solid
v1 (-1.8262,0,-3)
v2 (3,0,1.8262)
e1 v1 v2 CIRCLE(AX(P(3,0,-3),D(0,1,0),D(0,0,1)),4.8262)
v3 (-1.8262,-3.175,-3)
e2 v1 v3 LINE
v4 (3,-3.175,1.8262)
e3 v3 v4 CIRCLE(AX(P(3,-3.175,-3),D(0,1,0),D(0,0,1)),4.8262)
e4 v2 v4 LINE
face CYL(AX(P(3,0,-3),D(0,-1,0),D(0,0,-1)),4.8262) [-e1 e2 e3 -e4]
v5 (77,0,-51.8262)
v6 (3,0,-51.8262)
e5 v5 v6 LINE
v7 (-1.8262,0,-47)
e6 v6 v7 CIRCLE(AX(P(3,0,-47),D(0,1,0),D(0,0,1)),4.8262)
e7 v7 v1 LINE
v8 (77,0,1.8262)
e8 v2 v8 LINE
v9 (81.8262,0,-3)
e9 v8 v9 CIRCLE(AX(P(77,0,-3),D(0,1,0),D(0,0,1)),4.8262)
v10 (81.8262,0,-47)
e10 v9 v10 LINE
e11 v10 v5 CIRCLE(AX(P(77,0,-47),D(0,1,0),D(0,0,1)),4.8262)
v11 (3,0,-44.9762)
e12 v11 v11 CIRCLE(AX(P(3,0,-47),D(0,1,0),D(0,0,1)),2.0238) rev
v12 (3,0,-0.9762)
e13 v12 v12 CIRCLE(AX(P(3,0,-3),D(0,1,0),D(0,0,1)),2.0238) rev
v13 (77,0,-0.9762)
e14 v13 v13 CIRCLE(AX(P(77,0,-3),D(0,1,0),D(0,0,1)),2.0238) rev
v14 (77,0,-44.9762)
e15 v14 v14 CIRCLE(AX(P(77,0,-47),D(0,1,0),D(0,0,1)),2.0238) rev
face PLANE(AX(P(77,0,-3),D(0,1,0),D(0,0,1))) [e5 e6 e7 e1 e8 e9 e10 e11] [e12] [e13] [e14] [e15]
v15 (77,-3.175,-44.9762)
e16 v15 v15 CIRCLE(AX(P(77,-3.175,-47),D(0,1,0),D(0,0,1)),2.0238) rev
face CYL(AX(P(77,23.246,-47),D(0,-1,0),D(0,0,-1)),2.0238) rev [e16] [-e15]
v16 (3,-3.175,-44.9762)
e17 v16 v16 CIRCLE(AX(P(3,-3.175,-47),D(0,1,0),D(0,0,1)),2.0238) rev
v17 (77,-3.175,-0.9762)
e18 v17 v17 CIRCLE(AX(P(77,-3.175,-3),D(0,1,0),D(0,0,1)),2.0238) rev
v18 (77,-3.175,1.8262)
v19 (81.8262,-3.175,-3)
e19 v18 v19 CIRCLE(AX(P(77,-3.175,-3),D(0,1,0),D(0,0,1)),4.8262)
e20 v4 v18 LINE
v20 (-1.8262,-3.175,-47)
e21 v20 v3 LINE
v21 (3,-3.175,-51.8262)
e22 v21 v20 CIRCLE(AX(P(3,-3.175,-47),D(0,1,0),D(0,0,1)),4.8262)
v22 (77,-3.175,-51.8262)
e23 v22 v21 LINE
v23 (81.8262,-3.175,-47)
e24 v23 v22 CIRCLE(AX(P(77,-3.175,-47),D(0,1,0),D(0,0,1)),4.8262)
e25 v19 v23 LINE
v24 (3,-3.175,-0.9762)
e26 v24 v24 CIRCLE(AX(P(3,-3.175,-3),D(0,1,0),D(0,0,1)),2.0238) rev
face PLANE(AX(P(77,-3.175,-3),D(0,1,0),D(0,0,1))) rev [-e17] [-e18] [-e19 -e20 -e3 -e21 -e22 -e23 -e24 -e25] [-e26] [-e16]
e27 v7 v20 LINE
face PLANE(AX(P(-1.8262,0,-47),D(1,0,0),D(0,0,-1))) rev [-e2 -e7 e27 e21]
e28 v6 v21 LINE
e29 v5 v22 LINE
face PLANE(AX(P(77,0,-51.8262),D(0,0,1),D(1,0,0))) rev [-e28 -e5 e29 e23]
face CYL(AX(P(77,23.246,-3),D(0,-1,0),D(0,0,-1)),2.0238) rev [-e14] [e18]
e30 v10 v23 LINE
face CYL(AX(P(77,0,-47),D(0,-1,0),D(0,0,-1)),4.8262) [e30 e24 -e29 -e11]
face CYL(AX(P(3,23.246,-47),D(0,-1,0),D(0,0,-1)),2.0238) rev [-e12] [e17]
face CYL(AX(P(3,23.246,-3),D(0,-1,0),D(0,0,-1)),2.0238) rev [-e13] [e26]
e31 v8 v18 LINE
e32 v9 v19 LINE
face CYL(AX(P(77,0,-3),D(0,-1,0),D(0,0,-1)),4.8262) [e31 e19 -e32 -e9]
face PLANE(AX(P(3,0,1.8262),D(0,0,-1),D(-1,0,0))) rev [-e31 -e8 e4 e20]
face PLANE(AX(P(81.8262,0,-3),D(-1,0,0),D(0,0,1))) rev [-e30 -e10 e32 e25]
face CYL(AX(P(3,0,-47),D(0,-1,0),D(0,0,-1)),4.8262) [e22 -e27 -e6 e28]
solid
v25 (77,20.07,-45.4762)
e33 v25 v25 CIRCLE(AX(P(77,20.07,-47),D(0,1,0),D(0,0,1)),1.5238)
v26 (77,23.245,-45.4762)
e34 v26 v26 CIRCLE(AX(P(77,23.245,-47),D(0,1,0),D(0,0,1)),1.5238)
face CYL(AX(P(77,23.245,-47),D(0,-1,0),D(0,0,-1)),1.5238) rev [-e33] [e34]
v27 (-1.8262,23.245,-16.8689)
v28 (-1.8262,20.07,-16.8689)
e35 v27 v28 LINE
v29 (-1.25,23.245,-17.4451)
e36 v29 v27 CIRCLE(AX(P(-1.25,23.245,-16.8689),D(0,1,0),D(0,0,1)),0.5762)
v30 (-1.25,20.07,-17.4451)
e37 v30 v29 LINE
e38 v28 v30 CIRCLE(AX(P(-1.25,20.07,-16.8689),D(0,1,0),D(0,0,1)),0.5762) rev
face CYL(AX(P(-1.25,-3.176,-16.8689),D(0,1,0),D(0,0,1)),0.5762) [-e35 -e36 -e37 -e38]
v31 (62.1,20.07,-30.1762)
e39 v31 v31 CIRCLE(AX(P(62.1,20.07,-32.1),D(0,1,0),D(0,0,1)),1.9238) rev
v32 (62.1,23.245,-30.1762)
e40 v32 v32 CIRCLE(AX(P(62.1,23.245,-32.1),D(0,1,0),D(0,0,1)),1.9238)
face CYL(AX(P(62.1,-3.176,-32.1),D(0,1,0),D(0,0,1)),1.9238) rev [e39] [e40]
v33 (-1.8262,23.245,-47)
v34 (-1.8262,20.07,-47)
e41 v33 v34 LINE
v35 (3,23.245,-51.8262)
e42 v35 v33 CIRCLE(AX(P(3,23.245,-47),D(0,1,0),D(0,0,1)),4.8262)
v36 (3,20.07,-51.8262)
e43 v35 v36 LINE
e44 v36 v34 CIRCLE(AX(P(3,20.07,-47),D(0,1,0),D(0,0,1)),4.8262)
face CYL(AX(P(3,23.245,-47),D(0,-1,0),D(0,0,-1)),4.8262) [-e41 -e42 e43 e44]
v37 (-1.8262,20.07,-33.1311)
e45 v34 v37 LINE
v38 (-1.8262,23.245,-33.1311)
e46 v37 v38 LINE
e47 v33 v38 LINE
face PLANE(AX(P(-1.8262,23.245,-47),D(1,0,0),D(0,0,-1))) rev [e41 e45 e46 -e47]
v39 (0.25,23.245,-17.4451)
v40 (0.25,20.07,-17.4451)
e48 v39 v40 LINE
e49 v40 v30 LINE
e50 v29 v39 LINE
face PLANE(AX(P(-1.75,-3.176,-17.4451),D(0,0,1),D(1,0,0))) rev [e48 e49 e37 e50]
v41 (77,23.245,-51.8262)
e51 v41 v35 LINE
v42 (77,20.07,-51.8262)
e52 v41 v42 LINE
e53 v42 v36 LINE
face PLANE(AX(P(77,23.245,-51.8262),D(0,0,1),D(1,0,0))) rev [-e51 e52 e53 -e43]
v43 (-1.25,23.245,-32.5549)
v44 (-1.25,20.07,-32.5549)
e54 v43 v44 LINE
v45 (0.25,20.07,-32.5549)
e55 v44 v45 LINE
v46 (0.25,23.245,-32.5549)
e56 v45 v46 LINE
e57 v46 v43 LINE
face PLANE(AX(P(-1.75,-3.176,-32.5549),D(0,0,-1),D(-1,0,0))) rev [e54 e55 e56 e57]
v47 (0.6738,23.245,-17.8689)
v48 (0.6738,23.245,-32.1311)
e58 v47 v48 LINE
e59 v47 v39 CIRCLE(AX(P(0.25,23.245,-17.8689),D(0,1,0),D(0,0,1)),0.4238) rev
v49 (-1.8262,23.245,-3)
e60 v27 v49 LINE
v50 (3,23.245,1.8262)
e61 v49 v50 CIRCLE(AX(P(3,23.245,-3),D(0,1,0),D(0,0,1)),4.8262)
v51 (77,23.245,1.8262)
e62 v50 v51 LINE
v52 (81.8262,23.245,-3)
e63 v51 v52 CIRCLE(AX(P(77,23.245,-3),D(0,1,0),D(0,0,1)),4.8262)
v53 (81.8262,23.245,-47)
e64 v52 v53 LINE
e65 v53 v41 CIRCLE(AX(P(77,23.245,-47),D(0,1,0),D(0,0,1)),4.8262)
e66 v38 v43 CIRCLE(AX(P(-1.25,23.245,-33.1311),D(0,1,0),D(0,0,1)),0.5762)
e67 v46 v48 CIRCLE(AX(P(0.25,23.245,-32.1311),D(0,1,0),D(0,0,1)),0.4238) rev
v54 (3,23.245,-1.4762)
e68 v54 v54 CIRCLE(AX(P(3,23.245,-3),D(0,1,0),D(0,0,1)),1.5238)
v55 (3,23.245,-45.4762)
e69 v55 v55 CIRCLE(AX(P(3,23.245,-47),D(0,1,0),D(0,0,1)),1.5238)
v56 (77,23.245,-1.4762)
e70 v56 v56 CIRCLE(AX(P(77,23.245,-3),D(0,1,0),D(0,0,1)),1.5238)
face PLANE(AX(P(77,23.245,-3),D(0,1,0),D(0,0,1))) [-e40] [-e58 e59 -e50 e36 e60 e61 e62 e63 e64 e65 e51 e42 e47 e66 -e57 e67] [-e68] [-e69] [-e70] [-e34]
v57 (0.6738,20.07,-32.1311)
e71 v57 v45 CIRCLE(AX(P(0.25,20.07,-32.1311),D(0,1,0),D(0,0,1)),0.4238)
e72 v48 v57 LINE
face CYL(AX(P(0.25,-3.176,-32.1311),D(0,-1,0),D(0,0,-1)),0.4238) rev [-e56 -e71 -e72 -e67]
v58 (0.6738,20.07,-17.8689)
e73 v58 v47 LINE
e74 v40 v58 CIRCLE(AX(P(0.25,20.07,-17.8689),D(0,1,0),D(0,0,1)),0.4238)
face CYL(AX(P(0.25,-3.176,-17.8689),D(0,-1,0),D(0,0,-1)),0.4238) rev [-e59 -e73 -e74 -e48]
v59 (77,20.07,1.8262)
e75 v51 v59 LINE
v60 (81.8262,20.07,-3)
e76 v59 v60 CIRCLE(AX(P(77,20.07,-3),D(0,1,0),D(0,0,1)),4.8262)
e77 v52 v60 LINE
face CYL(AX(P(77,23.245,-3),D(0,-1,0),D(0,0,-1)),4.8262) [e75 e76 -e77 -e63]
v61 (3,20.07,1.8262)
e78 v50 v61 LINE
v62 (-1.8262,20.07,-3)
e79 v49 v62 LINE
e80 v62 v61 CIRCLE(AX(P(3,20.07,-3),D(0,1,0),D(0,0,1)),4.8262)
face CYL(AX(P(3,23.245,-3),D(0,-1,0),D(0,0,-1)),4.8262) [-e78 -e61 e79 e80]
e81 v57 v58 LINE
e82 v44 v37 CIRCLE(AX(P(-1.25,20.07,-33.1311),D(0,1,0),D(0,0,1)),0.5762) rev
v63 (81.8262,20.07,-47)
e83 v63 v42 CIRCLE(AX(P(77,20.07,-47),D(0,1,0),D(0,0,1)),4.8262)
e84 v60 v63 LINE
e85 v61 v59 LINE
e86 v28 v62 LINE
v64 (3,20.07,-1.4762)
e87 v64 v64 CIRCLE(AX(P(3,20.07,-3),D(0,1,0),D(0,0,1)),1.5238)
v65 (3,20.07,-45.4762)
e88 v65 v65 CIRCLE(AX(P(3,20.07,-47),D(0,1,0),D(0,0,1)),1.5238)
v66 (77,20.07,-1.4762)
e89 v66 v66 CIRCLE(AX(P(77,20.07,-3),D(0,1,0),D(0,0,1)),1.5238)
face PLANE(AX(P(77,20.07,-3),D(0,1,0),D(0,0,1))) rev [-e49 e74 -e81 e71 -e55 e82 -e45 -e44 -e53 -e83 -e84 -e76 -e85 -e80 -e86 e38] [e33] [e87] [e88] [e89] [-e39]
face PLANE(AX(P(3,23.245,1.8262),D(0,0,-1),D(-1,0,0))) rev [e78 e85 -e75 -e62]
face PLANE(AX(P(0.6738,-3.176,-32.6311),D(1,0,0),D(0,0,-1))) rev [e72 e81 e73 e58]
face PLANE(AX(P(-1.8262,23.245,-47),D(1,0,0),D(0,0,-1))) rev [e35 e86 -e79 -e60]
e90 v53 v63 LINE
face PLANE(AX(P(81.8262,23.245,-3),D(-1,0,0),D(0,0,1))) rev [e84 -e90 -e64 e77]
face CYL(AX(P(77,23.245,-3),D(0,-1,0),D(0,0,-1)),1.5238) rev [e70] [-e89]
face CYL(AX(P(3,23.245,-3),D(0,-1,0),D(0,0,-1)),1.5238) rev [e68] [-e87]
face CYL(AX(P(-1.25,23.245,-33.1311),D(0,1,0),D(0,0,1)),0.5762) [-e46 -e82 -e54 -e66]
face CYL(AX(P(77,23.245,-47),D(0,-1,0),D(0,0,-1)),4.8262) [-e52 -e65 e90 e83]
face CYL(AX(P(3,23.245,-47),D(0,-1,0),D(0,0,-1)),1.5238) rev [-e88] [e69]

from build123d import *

# Parameters (mm, degrees)
BOSS_EXTRUDE1_DEPTH             = 20.07
SKETCH3_R                       = 1.6
BOSS_EXTRUDE2_DEPTH             = 5.5
FILLET1_R                       = 2.5
CUT_EXTRUDE1_REACH              = 102.265
SKETCH4_R                       = 3.25
CUT_EXTRUDE2_REACH              = 102.265
SKETCH5_R                       = 2.15
CUT_EXTRUDE5_REACH              = 101.74
MOVE_START                      = 79.994994432
MOVE_FACE1_OUTLINE_R            = 3.75
MOVE_FACE1_OUTLINE_R_2          = 3.25
MOVE_FACE1_DEPTH                = 3.005005568
MOVE_START_2                    = -3
MOVE_FACE1_2_OUTLINE_R          = 2.65
MOVE_FACE1_2_OUTLINE_R_2        = 2.15
MOVE_FACE1_2_DEPTH              = 82.994994432
MOVE_FACE2_BY                   = 0.1
MOVE_FACE2_2_BY                 = 0.1
MOVE_FACE2_3_BY                 = 0.1
MOVE_FACE2_4_BY                 = 0.1
MOVE_FACE2_5_BY                 = 0.1
MOVE_FACE2_6_BY                 = 0.1
MOVE_FACE2_7_BY                 = 0.1
MOVE_FACE2_8_BY                 = 0.1
MOVE_FACE2_9_BY                 = 0.1
MOVE_FACE2_10_BY                = 0.1
MOVE_FACE2_11_BY                = 0.1
MOVE_FACE3_BY                   = 0.1
MOVE_FACE3_2_BY                 = 0.1
MOVE_FACE3_3_BY                 = 0.1
MOVE_FACE3_4_BY                 = 0.1
SKETCH6_R                       = 1.6
BOSS_EXTRUDE3_DEPTH             = 3.175
SKETCH7_R                       = 2
CUT_EXTRUDE3_DEPTH              = 3.175
SKETCH8_W                       = 2.5
SKETCH8_H                       = 15.2622
CUT_EXTRUDE4_DEPTH              = 3.175
SKETCH10_R                      = 2.1
M3_HEAT_SET_INSERT_HOLES_DEPTH  = 3.175
FILLET2_R                       = 0.5
KERF_START                      = -3.175
KERF_COMPENSATION_OUTLINE_R     = 2.1
KERF_COMPENSATION_OUTLINE_R_2   = 2.0238
KERF_COMPENSATION_DEPTH         = 3.175
KERF_START_2                    = 20.07
KERF_COMPENSATION_2_OUTLINE_R   = 1.6
KERF_COMPENSATION_2_OUTLINE_R_2 = 1.5238
KERF_COMPENSATION_2_OUTLINE_R_3 = 2
KERF_COMPENSATION_2_OUTLINE_R_4 = 1.9238
KERF_COMPENSATION_2_DEPTH       = 3.175


with BuildPart() as part:
    # Sketch2 → Boss-Extrude1 (new body)
    with BuildSketch(Plane(origin=(0, 0, 0), x_dir=(1, 0, 0), z_dir=(0, 1, 0))):
        with BuildLine():
            Line((77, 51.75), (3, 51.75))
            ThreePointArc((3, 51.75), (-0.358757211, 50.358757211), (-1.75, 47))
            Line((-1.75, 47), (-1.75, 3))
            ThreePointArc((-1.75, 3), (-0.358757211, -0.358757211), (3, -1.75))
            Line((3, -1.75), (77, -1.75))
            ThreePointArc((77, -1.75), (80.358757211, -0.358757211), (81.75, 3))
            Line((81.75, 3), (81.75, 47))
            ThreePointArc((81.75, 47), (80.358757211, 50.358757211), (77, 51.75))
        make_face()
        with BuildLine():
            Line((-0.25, 47), (-0.25, 3))
            ThreePointArc((-0.25, 3), (0.701902961, 0.701902961), (3, -0.25))
            Line((3, -0.25), (77, -0.25))
            ThreePointArc((77, -0.25), (79.298097039, 0.701902961), (80.25, 3))
            Line((80.25, 3), (80.25, 47))
            ThreePointArc((80.25, 47), (79.298097039, 49.298097039), (77, 50.25))
            Line((77, 50.25), (3, 50.25))
            ThreePointArc((3, 50.25), (0.701902961, 49.298097039), (-0.25, 47))
        make_face(mode=Mode.SUBTRACT)
    extrude(amount=BOSS_EXTRUDE1_DEPTH)

    # Sketch3 → Boss-Extrude2 (add)
    # profile 1 of 4: a face of its own
    with BuildSketch(Plane.XZ):
        with BuildLine():
            ThreePointArc((-0.25, -47), (0.701902961, -49.298097039), (3, -50.25))
            Line((3, -50.25), (5.5, -50.25))
            Line((5.5, -50.25), (5.5, -44.5))
            Line((5.5, -44.5), (-0.25, -44.5))
            Line((-0.25, -44.5), (-0.25, -47))
        make_face()
        with Locations(Location((3, -47, 0), (0, 0, 270))):
            Circle(SKETCH3_R, mode=Mode.SUBTRACT)
    # profile 2 of 4: a face of its own
    with BuildSketch(Plane.XZ):
        with BuildLine():
            Line((74.5, -44.5), (74.5, -50.25))
            Line((74.5, -50.25), (77, -50.25))
            ThreePointArc((77, -50.25), (79.298097039, -49.298097039), (80.25, -47))
            Line((80.25, -47), (80.25, -44.5))
            Line((80.25, -44.5), (74.5, -44.5))
        make_face()
        with Locations(Location((77, -47, 0), (0, 0, 270))):
            Circle(SKETCH3_R, mode=Mode.SUBTRACT)
    # profile 3 of 4: a face of its own
    with BuildSketch(Plane.XZ):
        with BuildLine():
            Line((74.5, -5.5), (80.25, -5.5))
            Line((80.25, -5.5), (80.25, -3))
            ThreePointArc((80.25, -3), (79.298097039, -0.701902961), (77, 0.25))
            Line((77, 0.25), (74.5, 0.25))
            Line((74.5, 0.25), (74.5, -5.5))
        make_face()
        with Locations(Location((77, -3, 0), (0, 0, 270))):
            Circle(SKETCH3_R, mode=Mode.SUBTRACT)
    # profile 4 of 4: a face of its own
    with BuildSketch(Plane.XZ):
        with BuildLine():
            Line((-0.25, -3), (-0.25, -5.5))
            Line((-0.25, -5.5), (5.5, -5.5))
            Line((5.5, -5.5), (5.5, 0.25))
            Line((5.5, 0.25), (3, 0.25))
            ThreePointArc((3, 0.25), (0.701902961, -0.701902961), (-0.25, -3))
        make_face()
        with Locations(Location((3, -3, 0), (0, 0, 270))):
            Circle(SKETCH3_R, mode=Mode.SUBTRACT)
    extrude(amount=-BOSS_EXTRUDE2_DEPTH)

    # Fillet1
    fillet1_edges = [part.edges().sort_by_distance(p)[0] for p in [
        (5.5, 2.75, 0.25),
        (5.5, 2.75, -5.5),
        (-0.25, 2.75, -5.5),
        (5.5, 2.75, -44.5),
        (5.5, 2.75, -50.25),
        (-0.25, 2.75, -44.5),
        (74.5, 2.75, -50.25),
        (74.5, 2.75, -44.5),
        (80.25, 2.75, -44.5),
        (74.5, 2.75, -5.5),
        (74.5, 2.75, 0.25),
        (80.25, 2.75, -5.5),
    ]]
    fillet(fillet1_edges, radius=FILLET1_R)

    # Sketch4 → Cut-Extrude1 (cut, up to next)
    with BuildSketch(Plane(origin=(81.75, 0, 0), x_dir=(0, 0, -1), z_dir=(1, 0, 0)), mode=Mode.PRIVATE) as cut_extrude1_sk1:
        with Locations((11.25, 13.5662)):
            Circle(SKETCH4_R)
    cut_extrude1_tool1 = extrude(cut_extrude1_sk1.sketch, amount=-CUT_EXTRUDE1_REACH, mode=Mode.PRIVATE) & part.part
    # Sketch4 → Cut-Extrude1 (cut, up to next)
    with BuildSketch(Plane(origin=(81.75, 0, 0), x_dir=(0, 0, -1), z_dir=(1, 0, 0)), mode=Mode.PRIVATE) as cut_extrude1_sk2:
        with BuildLine():
            Line((21.83, 7.07), (28.17, 7.07))
            ThreePointArc((28.17, 7.07), (29.089238816, 7.450761184), (29.47, 8.37))
            Line((29.47, 8.37), (29.47, 9.13))
            ThreePointArc((29.47, 9.13), (29.089238816, 10.049238816), (28.17, 10.43))
            Line((28.17, 10.43), (21.83, 10.43))
            ThreePointArc((21.83, 10.43), (20.910761184, 10.049238816), (20.53, 9.13))
            Line((20.53, 9.13), (20.53, 8.37))
            ThreePointArc((20.53, 8.37), (20.910761184, 7.450761184), (21.83, 7.07))
        make_face()
    cut_extrude1_tool2 = extrude(cut_extrude1_sk2.sketch, amount=-CUT_EXTRUDE1_REACH, mode=Mode.PRIVATE) & part.part
    # Sketch4 → Cut-Extrude1 (cut, up to next)
    with BuildSketch(Plane(origin=(81.75, 0, 0), x_dir=(0, 0, -1), z_dir=(1, 0, 0)), mode=Mode.PRIVATE) as cut_extrude1_sk3:
        with BuildLine():
            Line((36.5, 14.4662), (36.5, 20.07))
            ThreePointArc((36.5, 20.07), (39.6, 23.17), (42.7, 20.07))
            Line((42.7, 20.07), (42.7, 14.4662))
            ThreePointArc((42.7, 14.4662), (39.6, 11.3662), (36.5, 14.4662))
        make_face()
    cut_extrude1_tool3 = extrude(cut_extrude1_sk3.sketch, amount=-CUT_EXTRUDE1_REACH, mode=Mode.PRIVATE) & part.part
    # Sketch4 → Cut-Extrude1 (cut, up to next)
    with BuildSketch(Plane(origin=(81.75, 0, 0), x_dir=(0, 0, -1), z_dir=(1, 0, 0)), mode=Mode.PRIVATE) as cut_extrude1_sk4:
        Polygon((36.6, 2.78), (36.6, 5.28), (42.6, 5.28), (42.6, 2.704447838), (42.6, 0), (36.6, 0), align=None)
    cut_extrude1_tool4 = extrude(cut_extrude1_sk4.sketch, amount=-CUT_EXTRUDE1_REACH, mode=Mode.PRIVATE) & part.part
    add(cut_extrude1_tool1.solids().sort_by_distance((81.75, 13.5662, -11.25))[0], mode=Mode.SUBTRACT)
    add(cut_extrude1_tool2.solids().sort_by_distance((81.75, 8.75, -25))[0], mode=Mode.SUBTRACT)
    add(cut_extrude1_tool3.solids().sort_by_distance((81.75, 17.2681, -39.6))[0], mode=Mode.SUBTRACT)
    add(cut_extrude1_tool4.solids().sort_by_distance((81.75, 2.64, -39.6))[0], mode=Mode.SUBTRACT)

    # Sketch5 → Cut-Extrude2 (cut, up to next)
    with BuildSketch(Plane.ZY.offset(1.75), mode=Mode.PRIVATE) as cut_extrude2_sk1:
        with Locations((-11.97865482, 11.37450981)):
            Circle(SKETCH5_R)
    cut_extrude2_tool1 = extrude(cut_extrude2_sk1.sketch, amount=-CUT_EXTRUDE2_REACH, mode=Mode.PRIVATE) & part.part
    # Sketch5 → Cut-Extrude2 (cut, up to next)
    with BuildSketch(Plane.ZY.offset(1.75), mode=Mode.PRIVATE) as cut_extrude2_sk2:
        with BuildLine():
            Line((-32.5311, 15.7022), (-32.5311, 20.07))
            ThreePointArc((-32.5311, 20.07), (-25, 27.6011), (-17.4689, 20.07))
            Line((-17.4689, 20.07), (-17.4689, 15.7022))
            ThreePointArc((-17.4689, 15.7022), (-25, 8.1711), (-32.5311, 15.7022))
        make_face()
    cut_extrude2_tool2 = extrude(cut_extrude2_sk2.sketch, amount=-CUT_EXTRUDE2_REACH, mode=Mode.PRIVATE) & part.part
    add(cut_extrude2_tool1.solids().sort_by_distance((-1.75, 11.37451, -11.978655))[0], mode=Mode.SUBTRACT)
    add(cut_extrude2_tool2.solids().sort_by_distance((-1.75, 17.8861, -25))[0], mode=Mode.SUBTRACT)

    # Sketch9 → Cut-Extrude5 (cut, up to next)
    with BuildSketch(Plane.XY.offset(1.75), mode=Mode.PRIVATE) as cut_extrude5_sk1:
        with BuildLine():
            Line((33.55, 7.07), (33.55, 11.07))
            ThreePointArc((33.55, 11.07), (34.3, 11.82), (35.05, 11.07))
            Line((35.05, 11.07), (35.05, 7.07))
            ThreePointArc((35.05, 7.07), (34.3, 6.32), (33.55, 7.07))
        make_face()
    cut_extrude5_tool1 = extrude(cut_extrude5_sk1.sketch, amount=-CUT_EXTRUDE5_REACH, mode=Mode.PRIVATE) & part.part
    add(cut_extrude5_tool1.solids().sort_by_distance((34.3, 9.07, 1.75))[0], mode=Mode.SUBTRACT)

    # Move Face1: read off the stored shape, not the designer's step
    # Move Face1 outline → Move Face1 (cut)
    # profile 1 of 3: a face of its own
    with BuildSketch(Plane.YZ.offset(MOVE_START)):
        Polygon((0, -42.6), (0, -43.1), (5.5, -43.1), (5.78, -43.1), (5.78, -36.1), (0, -36.1), (0, -36.6), (5.28, -36.6), (5.28, -42.6), align=None)
    # profile 2 of 3: a face of its own
    with BuildSketch(Plane.YZ.offset(MOVE_START)):
        with Locations((13.5662, -11.25)):
            Circle(MOVE_FACE1_OUTLINE_R)
        with Locations((13.5662, -11.25)):
            Circle(MOVE_FACE1_OUTLINE_R_2, mode=Mode.SUBTRACT)
    # profile 3 of 3: a face of its own
    with BuildSketch(Plane.YZ.offset(MOVE_START)):
        with BuildLine():
            ThreePointArc((14.4662, -36), (10.8662, -39.6), (14.4662, -43.2))
            Line((14.4662, -43.2), (20.07, -43.2))
            Line((20.07, -43.2), (20.07, -42.7))
            Line((20.07, -42.7), (14.4662, -42.7))
            ThreePointArc((14.4662, -42.7), (11.3662, -39.6), (14.4662, -36.5))
            Line((14.4662, -36.5), (20.07, -36.5))
            Line((20.07, -36.5), (20.07, -36))
            Line((20.07, -36), (14.4662, -36))
        make_face()
    extrude(amount=MOVE_FACE1_DEPTH, mode=Mode.SUBTRACT)

    # Move Face1 2 outline → Move Face1 2 (cut)
    with BuildSketch(Plane.YZ.offset(MOVE_START_2)):
        with Locations((11.37450981, -11.97865482)):
            Circle(MOVE_FACE1_2_OUTLINE_R)
        with Locations((11.37450981, -11.97865482)):
            Circle(MOVE_FACE1_2_OUTLINE_R_2, mode=Mode.SUBTRACT)
    extrude(amount=MOVE_FACE1_2_DEPTH, mode=Mode.SUBTRACT)

    # Move Face2: a curved face moved inward by 0.1
    add(Solid.thicken(part.faces().sort_by_distance((81, 7.450761184, -29.089238816))[0], -MOVE_FACE2_BY), mode=Mode.SUBTRACT)

    # Move Face2 2: a face moved inward by 0.1
    extrude(part.faces().sort_by_distance((81, 10.43, -25))[0], amount=MOVE_FACE2_2_BY, dir=(0, 1, 0), mode=Mode.SUBTRACT)

    # Move Face2 3: a face moved inward by 0.1
    extrude(part.faces().sort_by_distance((81, 8.75, -29.47))[0], amount=MOVE_FACE2_3_BY, dir=(0, 0, -1), mode=Mode.SUBTRACT)

    # Move Face2 4: a curved face moved inward by 0.1
    add(Solid.thicken(part.faces().sort_by_distance((81, 10.049238816, -29.089238816))[0], -MOVE_FACE2_4_BY), mode=Mode.SUBTRACT)

    # Move Face2 5: a curved face moved inward by 0.1
    add(Solid.thicken(part.faces().sort_by_distance((81, 10.049238816, -20.910761184))[0], -MOVE_FACE2_5_BY), mode=Mode.SUBTRACT)

    # Move Face2 6: a face moved inward by 0.1
    extrude(part.faces().sort_by_distance((81, 8.75, -20.53))[0], amount=MOVE_FACE2_6_BY, dir=(0, 0, 1), mode=Mode.SUBTRACT)

    # Move Face2 7: a face moved inward by 0.1
    extrude(part.faces().sort_by_distance((81, 7.07, -25))[0], amount=MOVE_FACE2_7_BY, dir=(0, -1, 0), mode=Mode.SUBTRACT)

    # Move Face2 8: a curved face moved inward by 0.1
    add(Solid.thicken(part.faces().sort_by_distance((81, 7.450761184, -20.910761184))[0], -MOVE_FACE2_8_BY), mode=Mode.SUBTRACT)

    # Move Face2 9: a curved face moved inward by 0.1
    add(Solid.thicken(part.faces().sort_by_distance((-1, 8.1711, -25))[0], -MOVE_FACE2_9_BY), mode=Mode.SUBTRACT)

    # Move Face2 10: a face moved inward by 0.1
    extrude(part.faces().sort_by_distance((-1, 17.8861, -32.5311))[0], amount=MOVE_FACE2_10_BY, dir=(0, 0, -1), mode=Mode.SUBTRACT)

    # Move Face2 11: a face moved inward by 0.1
    extrude(part.faces().sort_by_distance((-1, 17.8861, -17.4689))[0], amount=MOVE_FACE2_11_BY, dir=(0, 0, 1), mode=Mode.SUBTRACT)

    # Move Face3: a curved face moved inward by 0.1
    add(Solid.thicken(part.faces().sort_by_distance((3, 2.75, -45.4))[0], -MOVE_FACE3_BY), mode=Mode.SUBTRACT)

    # Move Face3 2: a curved face moved inward by 0.1
    add(Solid.thicken(part.faces().sort_by_distance((77, 2.75, -45.4))[0], -MOVE_FACE3_2_BY), mode=Mode.SUBTRACT)

    # Move Face3 3: a curved face moved inward by 0.1
    add(Solid.thicken(part.faces().sort_by_distance((77, 2.75, -1.4))[0], -MOVE_FACE3_3_BY), mode=Mode.SUBTRACT)

    # Move Face3 4: a curved face moved inward by 0.1
    add(Solid.thicken(part.faces().sort_by_distance((3, 2.75, -1.4))[0], -MOVE_FACE3_4_BY), mode=Mode.SUBTRACT)


with BuildPart() as body_2:
    # Sketch6 → Boss-Extrude3 (new body)
    with BuildSketch(Plane(origin=(0, 20.07, 0), x_dir=(1, 0, 0), z_dir=(0, 1, 0))):
        with BuildLine():
            Line((3, -1.75), (77, -1.75))
            ThreePointArc((77, -1.75), (80.358757211, -0.358757211), (81.75, 3))
            Line((81.75, 3), (81.75, 47))
            ThreePointArc((81.75, 47), (80.358757211, 50.358757211), (77, 51.75))
            Line((77, 51.75), (3, 51.75))
            ThreePointArc((3, 51.75), (-0.358757211, 50.358757211), (-1.75, 47))
            Line((-1.75, 47), (-1.75, 3))
            ThreePointArc((-1.75, 3), (-0.358757211, -0.358757211), (3, -1.75))
        make_face()
        with Locations(Location((77, 47, 0), (0, 0, 270))):
            Circle(SKETCH6_R, mode=Mode.SUBTRACT)
        with Locations(Location((3, 47, 0), (0, 0, 270))):
            Circle(SKETCH6_R, mode=Mode.SUBTRACT)
        with Locations(Location((77, 3, 0), (0, 0, 270))):
            Circle(SKETCH6_R, mode=Mode.SUBTRACT)
        with Locations(Location((3, 3, 0), (0, 0, 270))):
            Circle(SKETCH6_R, mode=Mode.SUBTRACT)
    extrude(amount=BOSS_EXTRUDE3_DEPTH)


with BuildPart() as body_3:
    # Body-Move/Copy3: copy of body 2
    add(body_2.part.moved(Location((0, -44.867382743, 0))))


with BuildPart() as body_3_1:
    # Body-Move/Copy4: read off the stored shape, not the designer's step
    # Body-Move/Copy4: moved
    add(body_3.part.moved(Location((0, 21.6223827, 0))))

    # Sketch10 → M3 Heat Set Insert Holes (cut)
    with BuildSketch(Plane.XZ.offset(3.175)):
        with Locations(Location((77, -3, 0), (0, 0, 270))):
            Circle(SKETCH10_R)
        with Locations(Location((3, -3, 0), (0, 0, 270))):
            Circle(SKETCH10_R)
        with Locations(Location((77, -47, 0), (0, 0, 270))):
            Circle(SKETCH10_R)
        with Locations(Location((3, -47, 0), (0, 0, 270))):
            Circle(SKETCH10_R)
    extrude(amount=-M3_HEAT_SET_INSERT_HOLES_DEPTH, mode=Mode.SUBTRACT)

    # kerf compensation: read off the stored shape, not the designer's step
    # kerf compensation outline → kerf compensation (add)
    # profile 1 of 5: a face of its own
    with BuildSketch(Plane(origin=(0, 0, 0), x_dir=(1, 0, 0), z_dir=(0, 1, 0)).offset(KERF_START)):
        with BuildLine():
            ThreePointArc((77, -1.8262), (80.412638747, -0.412638747), (81.8262, 3))
            Line((81.8262, 3), (81.8262, 47))
            ThreePointArc((81.8262, 47), (80.412638747, 50.412638747), (77, 51.8262))
            Line((77, 51.8262), (3, 51.8262))
            ThreePointArc((3, 51.8262), (-0.412638747, 50.412638747), (-1.8262, 47))
            Line((-1.8262, 47), (-1.8262, 3))
            ThreePointArc((-1.8262, 3), (-0.412638747, -0.412638747), (3, -1.8262))
            Line((3, -1.8262), (77, -1.8262))
        make_face()
        with BuildLine():
            Line((81.75, 47), (81.75, 3))
            ThreePointArc((81.75, 3), (80.358757211, -0.358757211), (77, -1.75))
            Line((77, -1.75), (3, -1.75))
            ThreePointArc((3, -1.75), (-0.358757211, -0.358757211), (-1.75, 3))
            Line((-1.75, 3), (-1.75, 47))
            ThreePointArc((-1.75, 47), (-0.358757211, 50.358757211), (3, 51.75))
            Line((3, 51.75), (77, 51.75))
            ThreePointArc((77, 51.75), (80.358757211, 50.358757211), (81.75, 47))
        make_face(mode=Mode.SUBTRACT)
    # profile 2 of 5: a face of its own
    with BuildSketch(Plane(origin=(0, 0, 0), x_dir=(1, 0, 0), z_dir=(0, 1, 0)).offset(KERF_START)):
        with Locations((77, 3)):
            Circle(KERF_COMPENSATION_OUTLINE_R)
        with Locations((77, 3)):
            Circle(KERF_COMPENSATION_OUTLINE_R_2, mode=Mode.SUBTRACT)
    # profile 3 of 5: a face of its own
    with BuildSketch(Plane(origin=(0, 0, 0), x_dir=(1, 0, 0), z_dir=(0, 1, 0)).offset(KERF_START)):
        with Locations((3, 47)):
            Circle(KERF_COMPENSATION_OUTLINE_R)
        with Locations((3, 47)):
            Circle(KERF_COMPENSATION_OUTLINE_R_2, mode=Mode.SUBTRACT)
    # profile 4 of 5: a face of its own
    with BuildSketch(Plane(origin=(0, 0, 0), x_dir=(1, 0, 0), z_dir=(0, 1, 0)).offset(KERF_START)):
        with Locations((77, 47)):
            Circle(KERF_COMPENSATION_OUTLINE_R)
        with Locations((77, 47)):
            Circle(KERF_COMPENSATION_OUTLINE_R_2, mode=Mode.SUBTRACT)
    # profile 5 of 5: a face of its own
    with BuildSketch(Plane(origin=(0, 0, 0), x_dir=(1, 0, 0), z_dir=(0, 1, 0)).offset(KERF_START)):
        with Locations((3, 3)):
            Circle(KERF_COMPENSATION_OUTLINE_R)
        with Locations((3, 3)):
            Circle(KERF_COMPENSATION_OUTLINE_R_2, mode=Mode.SUBTRACT)
    extrude(amount=KERF_COMPENSATION_DEPTH)


with BuildPart() as body_2_1:
    add(body_2.part)

    # Sketch7 → Cut-Extrude3 (cut)
    with BuildSketch(Plane(origin=(0, 23.245, 0), x_dir=(1, 0, 0), z_dir=(0, 1, 0))):
        with Locations(Location((62.1, 32.1, 0), (0, 0, 270))):
            Circle(SKETCH7_R)
    extrude(amount=-CUT_EXTRUDE3_DEPTH, mode=Mode.SUBTRACT)

    # Sketch8 → Cut-Extrude4 (cut)
    with BuildSketch(Plane(origin=(0, 23.245, 0), x_dir=(1, 0, 0), z_dir=(0, 1, 0))):
        with Locations((-0.5, 25)):
            Rectangle(SKETCH8_W, SKETCH8_H)
    extrude(amount=-CUT_EXTRUDE4_DEPTH, mode=Mode.SUBTRACT)

    # Fillet2
    fillet2_edges = [body_2_1.edges().sort_by_distance(p)[0] for p in [
        (-1.75, 21.6575, -17.3689),
        (-1.75, 21.6575, -32.6311),
        (0.75, 21.6575, -32.6311),
        (0.75, 21.6575, -17.3689),
    ]]
    fillet(fillet2_edges, radius=FILLET2_R)

    # kerf compensation 2 outline → kerf compensation 2 (add)
    # profile 1 of 6: a face of its own
    with BuildSketch(Plane(origin=(0, 0, 0), x_dir=(1, 0, 0), z_dir=(0, 1, 0)).offset(KERF_START_2)):
        with BuildLine():
            Line((-1.8262, 47), (-1.8262, 33.1311))
            ThreePointArc((-1.8262, 33.1311), (-1.657434927, 32.723665073), (-1.25, 32.5549))
            Line((-1.25, 32.5549), (0.25, 32.5549))
            ThreePointArc((0.25, 32.5549), (0.549671854, 32.430771854), (0.6738, 32.1311))
            Line((0.6738, 32.1311), (0.6738, 17.8689))
            ThreePointArc((0.6738, 17.8689), (0.549671854, 17.569228146), (0.25, 17.4451))
            Line((0.25, 17.4451), (-1.25, 17.4451))
            ThreePointArc((-1.25, 17.4451), (-1.657434927, 17.276334927), (-1.8262, 16.8689))
            Line((-1.8262, 16.8689), (-1.8262, 3))
            ThreePointArc((-1.8262, 3), (-0.412638747, -0.412638747), (3, -1.8262))
            Line((3, -1.8262), (77, -1.8262))
            ThreePointArc((77, -1.8262), (80.412638747, -0.412638747), (81.8262, 3))
            Line((81.8262, 3), (81.8262, 47))
            ThreePointArc((81.8262, 47), (80.412638747, 50.412638747), (77, 51.8262))
            Line((77, 51.8262), (3, 51.8262))
            ThreePointArc((3, 51.8262), (-0.412638747, 50.412638747), (-1.8262, 47))
        make_face()
        with BuildLine():
            ThreePointArc((-1.25, 32.6311), (-1.603553391, 32.777546609), (-1.75, 33.1311))
            Line((-1.75, 33.1311), (-1.75, 47))
            ThreePointArc((-1.75, 47), (-0.358757211, 50.358757211), (3, 51.75))
            Line((3, 51.75), (77, 51.75))
            ThreePointArc((77, 51.75), (80.358757211, 50.358757211), (81.75, 47))
            Line((81.75, 47), (81.75, 3))
            ThreePointArc((81.75, 3), (80.358757211, -0.358757211), (77, -1.75))
            Line((77, -1.75), (3, -1.75))
            ThreePointArc((3, -1.75), (-0.358757211, -0.358757211), (-1.75, 3))
            Line((-1.75, 3), (-1.75, 16.8689))
            ThreePointArc((-1.75, 16.8689), (-1.603553391, 17.222453391), (-1.25, 17.3689))
            Line((-1.25, 17.3689), (0.25, 17.3689))
            ThreePointArc((0.25, 17.3689), (0.603553391, 17.515346609), (0.75, 17.8689))
            Line((0.75, 17.8689), (0.75, 32.1311))
            ThreePointArc((0.75, 32.1311), (0.603553391, 32.484653391), (0.25, 32.6311))
            Line((0.25, 32.6311), (-1.25, 32.6311))
        make_face(mode=Mode.SUBTRACT)
    # profile 2 of 6: a face of its own
    with BuildSketch(Plane(origin=(0, 0, 0), x_dir=(1, 0, 0), z_dir=(0, 1, 0)).offset(KERF_START_2)):
        with Locations((77, 47)):
            Circle(KERF_COMPENSATION_2_OUTLINE_R)
        with Locations((77, 47)):
            Circle(KERF_COMPENSATION_2_OUTLINE_R_2, mode=Mode.SUBTRACT)
    # profile 3 of 6: a face of its own
    with BuildSketch(Plane(origin=(0, 0, 0), x_dir=(1, 0, 0), z_dir=(0, 1, 0)).offset(KERF_START_2)):
        with Locations((3, 47)):
            Circle(KERF_COMPENSATION_2_OUTLINE_R)
        with Locations((3, 47)):
            Circle(KERF_COMPENSATION_2_OUTLINE_R_2, mode=Mode.SUBTRACT)
    # profile 4 of 6: a face of its own
    with BuildSketch(Plane(origin=(0, 0, 0), x_dir=(1, 0, 0), z_dir=(0, 1, 0)).offset(KERF_START_2)):
        with Locations((77, 3)):
            Circle(KERF_COMPENSATION_2_OUTLINE_R)
        with Locations((77, 3)):
            Circle(KERF_COMPENSATION_2_OUTLINE_R_2, mode=Mode.SUBTRACT)
    # profile 5 of 6: a face of its own
    with BuildSketch(Plane(origin=(0, 0, 0), x_dir=(1, 0, 0), z_dir=(0, 1, 0)).offset(KERF_START_2)):
        with Locations((3, 3)):
            Circle(KERF_COMPENSATION_2_OUTLINE_R)
        with Locations((3, 3)):
            Circle(KERF_COMPENSATION_2_OUTLINE_R_2, mode=Mode.SUBTRACT)
    # profile 6 of 6: a face of its own
    with BuildSketch(Plane(origin=(0, 0, 0), x_dir=(1, 0, 0), z_dir=(0, 1, 0)).offset(KERF_START_2)):
        with Locations((62.1, 32.1)):
            Circle(KERF_COMPENSATION_2_OUTLINE_R_3)
        with Locations((62.1, 32.1)):
            Circle(KERF_COMPENSATION_2_OUTLINE_R_4, mode=Mode.SUBTRACT)
    extrude(amount=KERF_COMPENSATION_2_DEPTH)


solid = Compound([body_3_1.part, body_2_1.part])
